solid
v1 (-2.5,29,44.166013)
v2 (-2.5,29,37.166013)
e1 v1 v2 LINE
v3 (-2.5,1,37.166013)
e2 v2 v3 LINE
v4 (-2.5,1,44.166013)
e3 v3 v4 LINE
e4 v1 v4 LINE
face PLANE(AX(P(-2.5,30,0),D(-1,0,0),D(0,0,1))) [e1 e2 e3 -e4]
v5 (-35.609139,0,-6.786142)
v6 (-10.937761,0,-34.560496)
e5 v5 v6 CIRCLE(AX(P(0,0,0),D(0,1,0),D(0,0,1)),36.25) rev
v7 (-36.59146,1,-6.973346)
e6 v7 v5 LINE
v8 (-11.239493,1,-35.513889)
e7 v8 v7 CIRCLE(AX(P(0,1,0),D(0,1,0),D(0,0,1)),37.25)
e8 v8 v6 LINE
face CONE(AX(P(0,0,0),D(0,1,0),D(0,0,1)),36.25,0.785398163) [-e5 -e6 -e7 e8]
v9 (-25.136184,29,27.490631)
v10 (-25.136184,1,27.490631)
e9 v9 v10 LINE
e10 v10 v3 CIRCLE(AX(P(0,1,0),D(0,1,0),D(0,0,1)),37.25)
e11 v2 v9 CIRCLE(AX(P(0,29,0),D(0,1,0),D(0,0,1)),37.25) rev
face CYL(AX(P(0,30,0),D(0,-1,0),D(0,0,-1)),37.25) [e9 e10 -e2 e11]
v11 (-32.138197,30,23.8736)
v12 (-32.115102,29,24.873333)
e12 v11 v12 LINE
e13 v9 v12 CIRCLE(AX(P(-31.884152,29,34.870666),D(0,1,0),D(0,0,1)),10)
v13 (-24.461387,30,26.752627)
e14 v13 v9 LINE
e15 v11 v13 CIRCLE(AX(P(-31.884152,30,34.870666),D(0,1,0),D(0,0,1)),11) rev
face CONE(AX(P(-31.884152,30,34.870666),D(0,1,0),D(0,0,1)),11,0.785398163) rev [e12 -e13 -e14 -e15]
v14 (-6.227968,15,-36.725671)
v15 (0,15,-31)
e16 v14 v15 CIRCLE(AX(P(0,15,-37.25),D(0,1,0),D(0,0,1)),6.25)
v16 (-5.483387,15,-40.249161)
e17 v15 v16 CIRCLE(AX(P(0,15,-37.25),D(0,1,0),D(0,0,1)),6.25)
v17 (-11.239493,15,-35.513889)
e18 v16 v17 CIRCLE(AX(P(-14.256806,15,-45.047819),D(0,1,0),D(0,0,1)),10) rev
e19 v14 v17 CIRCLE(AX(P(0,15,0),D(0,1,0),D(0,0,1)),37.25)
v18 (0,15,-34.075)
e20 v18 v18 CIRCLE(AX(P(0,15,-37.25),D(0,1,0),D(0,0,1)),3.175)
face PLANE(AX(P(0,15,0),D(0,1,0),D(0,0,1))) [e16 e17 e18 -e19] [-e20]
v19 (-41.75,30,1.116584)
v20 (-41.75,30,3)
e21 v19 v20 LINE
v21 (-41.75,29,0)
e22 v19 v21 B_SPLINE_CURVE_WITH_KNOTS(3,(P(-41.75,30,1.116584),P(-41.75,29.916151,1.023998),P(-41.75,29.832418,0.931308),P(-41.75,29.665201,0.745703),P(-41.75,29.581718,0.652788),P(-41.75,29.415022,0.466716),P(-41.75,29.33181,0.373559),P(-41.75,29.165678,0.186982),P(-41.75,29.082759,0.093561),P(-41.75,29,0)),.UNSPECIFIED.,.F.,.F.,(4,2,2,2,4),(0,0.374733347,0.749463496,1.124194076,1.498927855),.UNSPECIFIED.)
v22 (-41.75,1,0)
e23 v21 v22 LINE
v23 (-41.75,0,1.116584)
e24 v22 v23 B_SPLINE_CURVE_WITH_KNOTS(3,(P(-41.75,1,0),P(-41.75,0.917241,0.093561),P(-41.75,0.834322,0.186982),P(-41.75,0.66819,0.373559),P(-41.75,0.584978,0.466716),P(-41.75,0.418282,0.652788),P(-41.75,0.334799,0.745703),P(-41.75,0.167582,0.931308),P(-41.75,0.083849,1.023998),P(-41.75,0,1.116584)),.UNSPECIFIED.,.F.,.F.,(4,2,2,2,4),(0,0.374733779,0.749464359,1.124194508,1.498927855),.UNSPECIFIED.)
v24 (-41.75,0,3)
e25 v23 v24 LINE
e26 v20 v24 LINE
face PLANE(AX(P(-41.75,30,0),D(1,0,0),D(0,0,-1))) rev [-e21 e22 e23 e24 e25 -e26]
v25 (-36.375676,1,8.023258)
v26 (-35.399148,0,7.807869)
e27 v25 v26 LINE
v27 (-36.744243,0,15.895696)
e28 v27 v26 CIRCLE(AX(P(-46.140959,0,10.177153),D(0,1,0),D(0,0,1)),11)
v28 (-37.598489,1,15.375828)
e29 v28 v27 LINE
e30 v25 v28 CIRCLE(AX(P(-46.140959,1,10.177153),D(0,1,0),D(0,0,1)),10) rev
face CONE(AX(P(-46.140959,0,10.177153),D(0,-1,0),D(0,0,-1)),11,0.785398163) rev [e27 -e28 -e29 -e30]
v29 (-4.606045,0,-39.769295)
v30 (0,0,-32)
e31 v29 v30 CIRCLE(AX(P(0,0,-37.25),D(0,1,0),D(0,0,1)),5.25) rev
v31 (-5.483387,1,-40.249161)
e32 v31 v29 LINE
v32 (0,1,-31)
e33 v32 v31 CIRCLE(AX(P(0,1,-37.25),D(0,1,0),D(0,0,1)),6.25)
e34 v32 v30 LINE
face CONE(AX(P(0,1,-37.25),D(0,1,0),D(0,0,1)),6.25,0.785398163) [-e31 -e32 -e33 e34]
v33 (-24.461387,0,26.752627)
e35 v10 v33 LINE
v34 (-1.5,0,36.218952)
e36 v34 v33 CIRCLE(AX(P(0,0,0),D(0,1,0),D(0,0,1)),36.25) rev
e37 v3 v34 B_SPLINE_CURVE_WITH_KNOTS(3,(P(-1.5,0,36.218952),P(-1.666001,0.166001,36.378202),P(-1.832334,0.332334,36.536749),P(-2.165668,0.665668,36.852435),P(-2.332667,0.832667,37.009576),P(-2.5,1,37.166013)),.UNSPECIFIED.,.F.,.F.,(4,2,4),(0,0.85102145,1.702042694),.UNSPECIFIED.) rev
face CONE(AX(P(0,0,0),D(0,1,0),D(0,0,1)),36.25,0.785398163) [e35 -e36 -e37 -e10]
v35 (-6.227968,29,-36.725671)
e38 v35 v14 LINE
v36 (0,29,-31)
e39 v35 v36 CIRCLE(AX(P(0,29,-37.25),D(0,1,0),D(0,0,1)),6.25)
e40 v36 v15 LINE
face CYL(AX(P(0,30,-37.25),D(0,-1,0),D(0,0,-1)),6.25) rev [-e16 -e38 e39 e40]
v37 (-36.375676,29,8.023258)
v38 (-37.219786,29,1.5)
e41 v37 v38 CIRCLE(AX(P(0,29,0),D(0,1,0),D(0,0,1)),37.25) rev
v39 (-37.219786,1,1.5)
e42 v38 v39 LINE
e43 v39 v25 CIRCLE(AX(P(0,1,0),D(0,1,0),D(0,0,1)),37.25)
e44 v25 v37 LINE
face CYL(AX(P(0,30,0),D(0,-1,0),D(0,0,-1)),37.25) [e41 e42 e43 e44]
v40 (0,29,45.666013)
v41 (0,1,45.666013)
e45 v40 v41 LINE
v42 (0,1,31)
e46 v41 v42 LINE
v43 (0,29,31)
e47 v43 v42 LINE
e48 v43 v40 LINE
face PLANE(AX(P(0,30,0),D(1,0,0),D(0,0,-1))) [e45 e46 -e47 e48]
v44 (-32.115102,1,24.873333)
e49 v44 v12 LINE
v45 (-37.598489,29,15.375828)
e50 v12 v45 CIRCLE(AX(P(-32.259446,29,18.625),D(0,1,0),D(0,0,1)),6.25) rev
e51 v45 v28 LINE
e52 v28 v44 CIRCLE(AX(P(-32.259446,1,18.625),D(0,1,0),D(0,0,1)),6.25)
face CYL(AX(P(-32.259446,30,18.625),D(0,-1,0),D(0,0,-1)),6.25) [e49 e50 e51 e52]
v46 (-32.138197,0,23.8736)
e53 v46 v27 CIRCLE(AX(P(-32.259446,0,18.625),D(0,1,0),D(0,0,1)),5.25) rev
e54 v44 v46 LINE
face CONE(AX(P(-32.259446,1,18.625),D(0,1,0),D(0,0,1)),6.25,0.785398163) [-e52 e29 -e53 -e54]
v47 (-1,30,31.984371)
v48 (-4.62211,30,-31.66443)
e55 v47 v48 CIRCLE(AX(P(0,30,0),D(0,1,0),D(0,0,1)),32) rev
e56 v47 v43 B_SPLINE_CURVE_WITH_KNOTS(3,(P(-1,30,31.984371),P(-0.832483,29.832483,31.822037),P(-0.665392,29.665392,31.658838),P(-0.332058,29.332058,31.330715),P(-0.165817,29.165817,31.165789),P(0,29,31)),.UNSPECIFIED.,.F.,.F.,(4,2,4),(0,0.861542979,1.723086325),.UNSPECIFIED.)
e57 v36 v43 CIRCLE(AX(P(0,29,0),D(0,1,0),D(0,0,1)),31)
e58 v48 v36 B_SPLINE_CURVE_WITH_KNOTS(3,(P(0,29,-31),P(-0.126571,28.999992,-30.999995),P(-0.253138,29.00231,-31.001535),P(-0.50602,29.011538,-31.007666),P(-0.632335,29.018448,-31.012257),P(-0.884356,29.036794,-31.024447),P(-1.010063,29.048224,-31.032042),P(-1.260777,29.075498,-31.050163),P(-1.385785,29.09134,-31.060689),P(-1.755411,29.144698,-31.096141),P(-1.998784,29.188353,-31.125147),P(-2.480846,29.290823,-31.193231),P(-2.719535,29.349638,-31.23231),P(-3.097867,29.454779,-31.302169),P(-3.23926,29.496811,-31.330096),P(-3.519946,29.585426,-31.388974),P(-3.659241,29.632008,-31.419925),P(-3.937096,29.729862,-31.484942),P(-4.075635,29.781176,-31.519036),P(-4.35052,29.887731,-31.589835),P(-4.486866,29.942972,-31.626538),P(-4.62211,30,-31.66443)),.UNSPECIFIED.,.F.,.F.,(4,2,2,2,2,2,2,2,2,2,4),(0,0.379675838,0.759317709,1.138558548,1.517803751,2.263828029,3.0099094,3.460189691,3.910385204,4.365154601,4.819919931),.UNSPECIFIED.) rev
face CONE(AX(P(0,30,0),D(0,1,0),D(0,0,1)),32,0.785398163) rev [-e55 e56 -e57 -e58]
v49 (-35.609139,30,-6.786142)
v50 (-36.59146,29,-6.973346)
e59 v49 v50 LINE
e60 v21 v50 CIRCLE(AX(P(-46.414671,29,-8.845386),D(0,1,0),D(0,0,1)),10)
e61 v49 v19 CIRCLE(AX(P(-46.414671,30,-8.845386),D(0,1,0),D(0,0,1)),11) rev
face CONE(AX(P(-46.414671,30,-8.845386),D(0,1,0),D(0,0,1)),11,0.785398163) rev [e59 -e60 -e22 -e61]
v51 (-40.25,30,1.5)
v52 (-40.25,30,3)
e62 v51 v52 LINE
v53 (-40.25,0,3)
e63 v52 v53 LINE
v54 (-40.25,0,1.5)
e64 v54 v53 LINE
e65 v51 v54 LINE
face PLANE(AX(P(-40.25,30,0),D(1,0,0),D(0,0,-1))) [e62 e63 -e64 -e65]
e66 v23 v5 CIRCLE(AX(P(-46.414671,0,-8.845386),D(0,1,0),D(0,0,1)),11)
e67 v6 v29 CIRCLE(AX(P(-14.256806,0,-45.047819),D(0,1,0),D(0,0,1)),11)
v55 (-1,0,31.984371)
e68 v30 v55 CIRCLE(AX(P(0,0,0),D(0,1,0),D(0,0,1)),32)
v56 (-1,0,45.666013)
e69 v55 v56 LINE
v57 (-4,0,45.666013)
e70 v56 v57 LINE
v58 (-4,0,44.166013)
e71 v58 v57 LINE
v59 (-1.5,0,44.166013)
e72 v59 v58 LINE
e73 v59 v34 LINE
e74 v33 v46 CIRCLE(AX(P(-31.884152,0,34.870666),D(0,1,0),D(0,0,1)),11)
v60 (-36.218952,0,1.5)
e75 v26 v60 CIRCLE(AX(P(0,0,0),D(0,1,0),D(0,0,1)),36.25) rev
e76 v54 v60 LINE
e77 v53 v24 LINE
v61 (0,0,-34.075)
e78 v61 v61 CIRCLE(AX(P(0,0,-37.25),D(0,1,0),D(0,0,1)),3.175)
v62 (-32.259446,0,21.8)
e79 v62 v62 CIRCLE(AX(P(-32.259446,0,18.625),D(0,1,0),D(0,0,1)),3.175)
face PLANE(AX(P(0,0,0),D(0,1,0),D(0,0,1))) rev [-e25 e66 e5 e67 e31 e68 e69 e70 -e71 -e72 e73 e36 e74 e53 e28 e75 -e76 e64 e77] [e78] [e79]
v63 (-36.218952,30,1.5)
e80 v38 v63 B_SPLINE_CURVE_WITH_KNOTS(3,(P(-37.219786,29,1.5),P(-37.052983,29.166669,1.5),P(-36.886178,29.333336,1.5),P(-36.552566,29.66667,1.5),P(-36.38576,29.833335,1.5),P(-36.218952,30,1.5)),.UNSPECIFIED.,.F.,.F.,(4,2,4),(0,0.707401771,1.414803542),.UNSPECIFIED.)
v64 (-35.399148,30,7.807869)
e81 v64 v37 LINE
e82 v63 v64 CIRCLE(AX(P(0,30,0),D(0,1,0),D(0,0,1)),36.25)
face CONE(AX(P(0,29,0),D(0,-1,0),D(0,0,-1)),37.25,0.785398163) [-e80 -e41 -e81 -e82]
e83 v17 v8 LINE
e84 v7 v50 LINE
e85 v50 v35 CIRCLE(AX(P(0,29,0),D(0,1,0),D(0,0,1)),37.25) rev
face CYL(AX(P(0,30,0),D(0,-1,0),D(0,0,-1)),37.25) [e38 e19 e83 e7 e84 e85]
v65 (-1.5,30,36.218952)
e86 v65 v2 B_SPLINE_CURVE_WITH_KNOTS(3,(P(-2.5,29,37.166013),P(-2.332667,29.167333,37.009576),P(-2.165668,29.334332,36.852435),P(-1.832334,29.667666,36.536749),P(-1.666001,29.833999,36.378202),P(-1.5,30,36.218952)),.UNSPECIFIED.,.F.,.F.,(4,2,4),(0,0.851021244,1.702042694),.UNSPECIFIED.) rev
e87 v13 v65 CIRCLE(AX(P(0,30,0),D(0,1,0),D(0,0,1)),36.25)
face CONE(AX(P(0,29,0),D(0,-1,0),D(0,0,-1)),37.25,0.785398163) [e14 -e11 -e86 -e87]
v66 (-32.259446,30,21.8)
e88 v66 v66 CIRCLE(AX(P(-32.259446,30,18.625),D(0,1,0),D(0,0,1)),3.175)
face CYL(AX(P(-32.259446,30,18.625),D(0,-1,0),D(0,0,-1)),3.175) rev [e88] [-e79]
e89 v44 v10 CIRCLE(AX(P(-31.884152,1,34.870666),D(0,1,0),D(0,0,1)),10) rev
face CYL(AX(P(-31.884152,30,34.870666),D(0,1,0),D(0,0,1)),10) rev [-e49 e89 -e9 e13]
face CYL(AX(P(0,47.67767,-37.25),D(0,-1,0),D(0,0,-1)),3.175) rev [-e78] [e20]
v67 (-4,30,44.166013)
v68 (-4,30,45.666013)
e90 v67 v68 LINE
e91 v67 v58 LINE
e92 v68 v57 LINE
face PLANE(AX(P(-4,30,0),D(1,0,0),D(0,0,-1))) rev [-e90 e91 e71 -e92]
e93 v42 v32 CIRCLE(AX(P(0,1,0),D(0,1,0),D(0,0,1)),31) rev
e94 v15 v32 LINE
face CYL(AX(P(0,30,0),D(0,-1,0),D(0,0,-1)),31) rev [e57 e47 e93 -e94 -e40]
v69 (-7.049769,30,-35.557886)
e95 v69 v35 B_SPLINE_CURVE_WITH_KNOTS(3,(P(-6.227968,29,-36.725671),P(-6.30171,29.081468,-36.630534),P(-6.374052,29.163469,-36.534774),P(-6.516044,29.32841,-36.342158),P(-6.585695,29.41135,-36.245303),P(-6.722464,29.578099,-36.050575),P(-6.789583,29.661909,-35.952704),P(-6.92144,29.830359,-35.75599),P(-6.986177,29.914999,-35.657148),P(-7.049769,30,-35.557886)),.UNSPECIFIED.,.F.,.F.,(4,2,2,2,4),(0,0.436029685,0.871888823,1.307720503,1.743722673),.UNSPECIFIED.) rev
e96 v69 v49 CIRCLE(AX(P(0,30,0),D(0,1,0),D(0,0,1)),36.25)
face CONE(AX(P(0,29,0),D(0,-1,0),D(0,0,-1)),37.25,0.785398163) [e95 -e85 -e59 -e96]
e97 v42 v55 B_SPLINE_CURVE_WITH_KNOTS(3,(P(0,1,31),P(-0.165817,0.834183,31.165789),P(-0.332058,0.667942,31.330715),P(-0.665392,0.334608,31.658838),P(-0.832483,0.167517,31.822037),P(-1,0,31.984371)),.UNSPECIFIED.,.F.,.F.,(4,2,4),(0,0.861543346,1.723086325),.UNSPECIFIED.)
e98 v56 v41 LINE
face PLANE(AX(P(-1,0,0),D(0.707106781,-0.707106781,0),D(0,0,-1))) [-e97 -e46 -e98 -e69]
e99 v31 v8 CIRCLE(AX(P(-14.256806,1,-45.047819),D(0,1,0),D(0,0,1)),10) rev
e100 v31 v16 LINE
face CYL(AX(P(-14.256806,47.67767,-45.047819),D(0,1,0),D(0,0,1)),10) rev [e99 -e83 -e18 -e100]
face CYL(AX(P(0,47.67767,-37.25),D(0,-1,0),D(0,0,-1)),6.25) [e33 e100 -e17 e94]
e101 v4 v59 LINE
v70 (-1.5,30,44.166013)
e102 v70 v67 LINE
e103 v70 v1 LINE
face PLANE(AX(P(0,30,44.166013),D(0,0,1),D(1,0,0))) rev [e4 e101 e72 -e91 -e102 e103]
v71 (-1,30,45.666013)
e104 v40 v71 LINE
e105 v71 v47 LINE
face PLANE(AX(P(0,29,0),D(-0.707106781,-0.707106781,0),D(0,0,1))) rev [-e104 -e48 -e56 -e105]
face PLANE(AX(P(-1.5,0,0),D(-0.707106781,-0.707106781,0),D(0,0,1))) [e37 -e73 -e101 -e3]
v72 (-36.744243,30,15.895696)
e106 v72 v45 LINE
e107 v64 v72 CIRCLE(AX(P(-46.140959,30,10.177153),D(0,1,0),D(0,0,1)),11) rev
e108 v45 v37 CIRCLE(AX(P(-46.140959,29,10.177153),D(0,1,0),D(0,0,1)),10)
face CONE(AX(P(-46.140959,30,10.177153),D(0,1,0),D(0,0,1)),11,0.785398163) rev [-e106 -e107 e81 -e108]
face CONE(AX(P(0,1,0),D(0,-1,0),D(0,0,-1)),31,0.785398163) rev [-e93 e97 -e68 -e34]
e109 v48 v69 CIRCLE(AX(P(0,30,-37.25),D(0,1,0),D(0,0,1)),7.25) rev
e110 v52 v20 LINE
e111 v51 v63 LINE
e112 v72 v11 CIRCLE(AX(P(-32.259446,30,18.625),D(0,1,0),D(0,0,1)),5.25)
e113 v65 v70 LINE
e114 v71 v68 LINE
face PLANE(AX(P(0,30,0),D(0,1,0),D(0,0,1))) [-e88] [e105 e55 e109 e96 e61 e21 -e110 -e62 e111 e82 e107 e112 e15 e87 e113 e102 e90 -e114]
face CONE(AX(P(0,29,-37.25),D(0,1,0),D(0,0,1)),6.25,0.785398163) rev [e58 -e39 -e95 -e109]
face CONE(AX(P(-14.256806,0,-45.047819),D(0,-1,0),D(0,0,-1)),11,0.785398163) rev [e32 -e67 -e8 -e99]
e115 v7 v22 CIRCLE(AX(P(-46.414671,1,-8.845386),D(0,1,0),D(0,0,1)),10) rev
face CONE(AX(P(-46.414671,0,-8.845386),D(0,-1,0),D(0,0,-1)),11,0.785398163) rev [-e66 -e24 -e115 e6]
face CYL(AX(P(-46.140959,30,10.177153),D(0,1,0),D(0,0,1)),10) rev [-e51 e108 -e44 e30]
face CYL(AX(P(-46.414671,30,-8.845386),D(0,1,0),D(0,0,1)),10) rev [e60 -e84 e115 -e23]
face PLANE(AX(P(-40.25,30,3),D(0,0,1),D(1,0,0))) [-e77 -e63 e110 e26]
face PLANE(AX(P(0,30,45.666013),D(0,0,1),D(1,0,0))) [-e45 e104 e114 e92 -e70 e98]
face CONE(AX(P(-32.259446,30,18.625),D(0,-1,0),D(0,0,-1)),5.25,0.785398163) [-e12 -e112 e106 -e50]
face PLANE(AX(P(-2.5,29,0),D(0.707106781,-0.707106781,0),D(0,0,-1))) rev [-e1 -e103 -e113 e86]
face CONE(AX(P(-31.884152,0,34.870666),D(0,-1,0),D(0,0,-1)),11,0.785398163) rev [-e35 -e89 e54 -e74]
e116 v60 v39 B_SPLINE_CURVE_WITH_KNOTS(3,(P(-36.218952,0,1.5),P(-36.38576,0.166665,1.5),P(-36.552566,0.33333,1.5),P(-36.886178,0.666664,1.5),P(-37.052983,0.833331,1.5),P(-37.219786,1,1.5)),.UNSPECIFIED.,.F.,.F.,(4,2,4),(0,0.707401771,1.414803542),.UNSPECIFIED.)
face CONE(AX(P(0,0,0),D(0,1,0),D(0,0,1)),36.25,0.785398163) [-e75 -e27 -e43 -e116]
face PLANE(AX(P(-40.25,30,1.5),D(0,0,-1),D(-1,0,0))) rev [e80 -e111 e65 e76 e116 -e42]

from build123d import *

# Parameters (mm, degrees)
SKETCH3_R           = 3.174999999999997
BOSS_EXTRUDE2_DEPTH = 30
SKETCH3_6_R         = 6.249999999999999
SKETCH3_6_R_2       = 3.174999999999996
BOSS_EXTRUDE3_DEPTH = 15
FILLET1_R           = 10
CHAMFER1_SIZE       = 1


with BuildPart() as part:
    # Sketch3 → Boss-Extrude2 (new body)
    with BuildSketch(Plane(origin=(0, 0, 0), x_dir=(1, 0, 0), z_dir=(0, 1, 0))):
        with BuildLine():
            ThreePointArc((-9.29e-15, 31), (-4.229978997044333, 32.64893733094583), (-6.227967505338837, 36.72567114093955))
            ThreePointArc((-6.227967505338856, 36.72567114093959), (-28.456583505173906, 24.03716612275798), (-37.249999999999986, -3.82e-15))
            Line((-37.25, 0), (-41.75, -5.5e-16))
            Line((-41.75, -5.5e-16), (-41.75, -3.000000000000001))
            Line((-41.75, -3.000000000000001), (-40.25, -3.000000000000001))
            Line((-40.25, -3.000000000000001), (-40.25, -1.5000000000000004))
            Line((-40.25, -1.5000000000000004), (-37.21978640454563, -1.5000000000000004))
            ThreePointArc((-37.21978640454562, -1.5000000000000002), (-36.52259085251633, -7.325493663889764), (-34.919347931756114, -12.969257496902395))
            ThreePointArc((-34.91934793175618, -12.969257496902411), (-37.67210506462307, -21.75000000000005), (-28.691380426417297, -23.75641364403726))
            ThreePointArc((-28.691380426417272, -23.756413644037238), (-16.975861979154317, -33.15693909372066), (-2.5, -37.166012699777184))
            Line((-2.4999999999999982, -37.1660126997772), (-2.4999999999999982, -44.1660126997772))
            Line((-2.4999999999999982, -44.1660126997772), (-3.9999999999999982, -44.1660126997772))
            Line((-3.9999999999999982, -44.1660126997772), (-3.9999999999999982, -45.6660126997772))
            Line((-3.9999999999999982, -45.6660126997772), (1.8e-15, -45.6660126997772))
            Line((1.8e-15, -45.6660126997772), (8.2e-16, -30.99999999999999))
            ThreePointArc((8.2e-16, -30.999999999999986), (-30.999999999999986, -3.39e-15), (-1.128e-14, 30.999999999999993))
        make_face()
        with Locations(Location((-32.25944629097033, -18.62500000000002, 0), (0, 0, 270))):
            Circle(SKETCH3_R, mode=Mode.SUBTRACT)
    extrude(amount=BOSS_EXTRUDE2_DEPTH)

    # Sketch3<6> → Boss-Extrude3 (add)
    with BuildSketch(Plane(origin=(0, 0, 0), x_dir=(1, 0, 0), z_dir=(0, 1, 0))):
        with Locations((-8.14e-15, 37.25)):
            Circle(SKETCH3_6_R)
        with Locations(Location((-8.14e-15, 37.25, 0), (0, 0, 270))):
            Circle(SKETCH3_6_R_2, mode=Mode.SUBTRACT)
    extrude(amount=BOSS_EXTRUDE3_DEPTH)

    # Fillet1
    # the kernel refuses this fillet: 10 mm, written as the material it adds along each edge
    with BuildSketch(Plane(origin=(-28.691380426417282, 0, 23.75641364403725), x_dir=(-0.9506898736636257, 0, 0.3101431348803961), z_dir=(0, 1, 0))) as fillet1_piece_1:
        with BuildLine():
            CenterArc((6.482344939436471, 9.575990594652419), FILLET1_R, 209.4937649075162, 43.761742692679945)
            ThreePointArc((-2.221747837989829, 4.652702169021102), (-1.030276989978153, 2.3648375481367587), (0, 0))
            ThreePointArc((0, 0), (1.8006513720656931, 0.26500587834223527), (3.6013027441313774, -6e-17))
        make_face()
    extrude(amount=30)
    with BuildSketch(Plane(origin=(-34.91934793175615, 0, 12.969257496902403), x_dir=(-0.7439367704475782, 0, 0.6682500142731217), z_dir=(0, 1, 0))) as fillet1_piece_2:
        with BuildLine():
            CenterArc((6.482344939436458, -9.575990594652419), FILLET1_R, 106.74449239980393, 43.76174269267989)
            ThreePointArc((-2.2217478379898448, -4.652702169021106), (-1.0302769899781694, -2.364837548136756), (0, 0))
            ThreePointArc((0, 0), (1.8006513720656803, -0.26500587834223843), (3.601302744131356, 6e-17))
        make_face()
    extrude(amount=30)
    with BuildSketch(Plane(origin=(-6.227967505338847, 0, -36.725671140939575), x_dir=(-0.9719890656078827, 0, 0.23502607586971094), z_dir=(0, 1, 0))) as fillet1_piece_3:
        with BuildLine():
            CenterArc((5.848021683595468, -9.976022963631705), FILLET1_R, 93.96846171792617, 43.7617426926798)
            ThreePointArc((-1.5518361342237537, -3.2497978502371354), (-0.5367780683599742, -1.7390925175521244), (0, 0))
            ThreePointArc((0, 0), (2.5779740557861452, -0.08931446047189494), (5.1559481115722905, 1e-17))
        make_face()
    extrude(amount=15)
    with BuildSketch(Plane(origin=(-37.24999999999999, 0, 1.78e-15), x_dir=(-1, 0, -7.737e-14), z_dir=(0, 1, 0))) as fillet1_piece_4:
        with BuildLine():
            CenterArc((9.164670658683216, -8.845385669716253), FILLET1_R, 117.80520941997419, 51.405137085838774)
            ThreePointArc((-0.6585400627312272, -6.973346374538821), (-0.16500045393500687, -3.5021862698004864), (0, 0))
            Line((0, 0), (4.500000000000192, 0))
        make_face()
    extrude(amount=30)

    # Chamfer1
    chamfer1_edges = [part.edges().sort_by_distance(p)[0] for p in [
        (-7.903771868670522, 0, -37.32519260636591),
        (-38.375294648334496, 0, -2.898249101229199),
        (-38.375294648334496, 30, -2.898249101229199),
        (-36.27645093259372, 0, 11.817729079196308),
        (-36.27645093259372, 30, 11.817729079196308),
        (-30.999999999999986, 0, 5.16e-15),
        (1.31e-15, 0, 38.33300634988859),
        (-2.4999999999999982, 0, 40.6660126997772),
        (-14.640454765554196, 0, 34.25229312407797),
        (-14.640454765554196, 30, 34.25229312407797),
        (-2.4999999999999982, 30, 40.6660126997772),
        (1.31e-15, 30, 38.33300634988859),
        (-30.999999999999986, 30, 5.16e-15),
        (-4.2299789970443324, 30, -32.64893733094583),
        (5.376209478406283, 0, -40.43729848685283),
        (-37.672105064623324, 0, 21.749999999999595),
        (-37.672105064623324, 30, 21.749999999999595),
        (-27.849428165120642, 0, -24.7380648167108),
        (-26.07059740166155, 30, -26.60613559163521),
        (-36.941998560282954, 0, 4.780297310006034),
        (-36.941998560282954, 30, 4.780297310006034),
        (-28.372679063924544, 0, 25.507463527167676),
        (-28.372679063924544, 30, 25.507463527167676),
    ]]
    chamfer(chamfer1_edges, length=CHAMFER1_SIZE)


solid = part.part
